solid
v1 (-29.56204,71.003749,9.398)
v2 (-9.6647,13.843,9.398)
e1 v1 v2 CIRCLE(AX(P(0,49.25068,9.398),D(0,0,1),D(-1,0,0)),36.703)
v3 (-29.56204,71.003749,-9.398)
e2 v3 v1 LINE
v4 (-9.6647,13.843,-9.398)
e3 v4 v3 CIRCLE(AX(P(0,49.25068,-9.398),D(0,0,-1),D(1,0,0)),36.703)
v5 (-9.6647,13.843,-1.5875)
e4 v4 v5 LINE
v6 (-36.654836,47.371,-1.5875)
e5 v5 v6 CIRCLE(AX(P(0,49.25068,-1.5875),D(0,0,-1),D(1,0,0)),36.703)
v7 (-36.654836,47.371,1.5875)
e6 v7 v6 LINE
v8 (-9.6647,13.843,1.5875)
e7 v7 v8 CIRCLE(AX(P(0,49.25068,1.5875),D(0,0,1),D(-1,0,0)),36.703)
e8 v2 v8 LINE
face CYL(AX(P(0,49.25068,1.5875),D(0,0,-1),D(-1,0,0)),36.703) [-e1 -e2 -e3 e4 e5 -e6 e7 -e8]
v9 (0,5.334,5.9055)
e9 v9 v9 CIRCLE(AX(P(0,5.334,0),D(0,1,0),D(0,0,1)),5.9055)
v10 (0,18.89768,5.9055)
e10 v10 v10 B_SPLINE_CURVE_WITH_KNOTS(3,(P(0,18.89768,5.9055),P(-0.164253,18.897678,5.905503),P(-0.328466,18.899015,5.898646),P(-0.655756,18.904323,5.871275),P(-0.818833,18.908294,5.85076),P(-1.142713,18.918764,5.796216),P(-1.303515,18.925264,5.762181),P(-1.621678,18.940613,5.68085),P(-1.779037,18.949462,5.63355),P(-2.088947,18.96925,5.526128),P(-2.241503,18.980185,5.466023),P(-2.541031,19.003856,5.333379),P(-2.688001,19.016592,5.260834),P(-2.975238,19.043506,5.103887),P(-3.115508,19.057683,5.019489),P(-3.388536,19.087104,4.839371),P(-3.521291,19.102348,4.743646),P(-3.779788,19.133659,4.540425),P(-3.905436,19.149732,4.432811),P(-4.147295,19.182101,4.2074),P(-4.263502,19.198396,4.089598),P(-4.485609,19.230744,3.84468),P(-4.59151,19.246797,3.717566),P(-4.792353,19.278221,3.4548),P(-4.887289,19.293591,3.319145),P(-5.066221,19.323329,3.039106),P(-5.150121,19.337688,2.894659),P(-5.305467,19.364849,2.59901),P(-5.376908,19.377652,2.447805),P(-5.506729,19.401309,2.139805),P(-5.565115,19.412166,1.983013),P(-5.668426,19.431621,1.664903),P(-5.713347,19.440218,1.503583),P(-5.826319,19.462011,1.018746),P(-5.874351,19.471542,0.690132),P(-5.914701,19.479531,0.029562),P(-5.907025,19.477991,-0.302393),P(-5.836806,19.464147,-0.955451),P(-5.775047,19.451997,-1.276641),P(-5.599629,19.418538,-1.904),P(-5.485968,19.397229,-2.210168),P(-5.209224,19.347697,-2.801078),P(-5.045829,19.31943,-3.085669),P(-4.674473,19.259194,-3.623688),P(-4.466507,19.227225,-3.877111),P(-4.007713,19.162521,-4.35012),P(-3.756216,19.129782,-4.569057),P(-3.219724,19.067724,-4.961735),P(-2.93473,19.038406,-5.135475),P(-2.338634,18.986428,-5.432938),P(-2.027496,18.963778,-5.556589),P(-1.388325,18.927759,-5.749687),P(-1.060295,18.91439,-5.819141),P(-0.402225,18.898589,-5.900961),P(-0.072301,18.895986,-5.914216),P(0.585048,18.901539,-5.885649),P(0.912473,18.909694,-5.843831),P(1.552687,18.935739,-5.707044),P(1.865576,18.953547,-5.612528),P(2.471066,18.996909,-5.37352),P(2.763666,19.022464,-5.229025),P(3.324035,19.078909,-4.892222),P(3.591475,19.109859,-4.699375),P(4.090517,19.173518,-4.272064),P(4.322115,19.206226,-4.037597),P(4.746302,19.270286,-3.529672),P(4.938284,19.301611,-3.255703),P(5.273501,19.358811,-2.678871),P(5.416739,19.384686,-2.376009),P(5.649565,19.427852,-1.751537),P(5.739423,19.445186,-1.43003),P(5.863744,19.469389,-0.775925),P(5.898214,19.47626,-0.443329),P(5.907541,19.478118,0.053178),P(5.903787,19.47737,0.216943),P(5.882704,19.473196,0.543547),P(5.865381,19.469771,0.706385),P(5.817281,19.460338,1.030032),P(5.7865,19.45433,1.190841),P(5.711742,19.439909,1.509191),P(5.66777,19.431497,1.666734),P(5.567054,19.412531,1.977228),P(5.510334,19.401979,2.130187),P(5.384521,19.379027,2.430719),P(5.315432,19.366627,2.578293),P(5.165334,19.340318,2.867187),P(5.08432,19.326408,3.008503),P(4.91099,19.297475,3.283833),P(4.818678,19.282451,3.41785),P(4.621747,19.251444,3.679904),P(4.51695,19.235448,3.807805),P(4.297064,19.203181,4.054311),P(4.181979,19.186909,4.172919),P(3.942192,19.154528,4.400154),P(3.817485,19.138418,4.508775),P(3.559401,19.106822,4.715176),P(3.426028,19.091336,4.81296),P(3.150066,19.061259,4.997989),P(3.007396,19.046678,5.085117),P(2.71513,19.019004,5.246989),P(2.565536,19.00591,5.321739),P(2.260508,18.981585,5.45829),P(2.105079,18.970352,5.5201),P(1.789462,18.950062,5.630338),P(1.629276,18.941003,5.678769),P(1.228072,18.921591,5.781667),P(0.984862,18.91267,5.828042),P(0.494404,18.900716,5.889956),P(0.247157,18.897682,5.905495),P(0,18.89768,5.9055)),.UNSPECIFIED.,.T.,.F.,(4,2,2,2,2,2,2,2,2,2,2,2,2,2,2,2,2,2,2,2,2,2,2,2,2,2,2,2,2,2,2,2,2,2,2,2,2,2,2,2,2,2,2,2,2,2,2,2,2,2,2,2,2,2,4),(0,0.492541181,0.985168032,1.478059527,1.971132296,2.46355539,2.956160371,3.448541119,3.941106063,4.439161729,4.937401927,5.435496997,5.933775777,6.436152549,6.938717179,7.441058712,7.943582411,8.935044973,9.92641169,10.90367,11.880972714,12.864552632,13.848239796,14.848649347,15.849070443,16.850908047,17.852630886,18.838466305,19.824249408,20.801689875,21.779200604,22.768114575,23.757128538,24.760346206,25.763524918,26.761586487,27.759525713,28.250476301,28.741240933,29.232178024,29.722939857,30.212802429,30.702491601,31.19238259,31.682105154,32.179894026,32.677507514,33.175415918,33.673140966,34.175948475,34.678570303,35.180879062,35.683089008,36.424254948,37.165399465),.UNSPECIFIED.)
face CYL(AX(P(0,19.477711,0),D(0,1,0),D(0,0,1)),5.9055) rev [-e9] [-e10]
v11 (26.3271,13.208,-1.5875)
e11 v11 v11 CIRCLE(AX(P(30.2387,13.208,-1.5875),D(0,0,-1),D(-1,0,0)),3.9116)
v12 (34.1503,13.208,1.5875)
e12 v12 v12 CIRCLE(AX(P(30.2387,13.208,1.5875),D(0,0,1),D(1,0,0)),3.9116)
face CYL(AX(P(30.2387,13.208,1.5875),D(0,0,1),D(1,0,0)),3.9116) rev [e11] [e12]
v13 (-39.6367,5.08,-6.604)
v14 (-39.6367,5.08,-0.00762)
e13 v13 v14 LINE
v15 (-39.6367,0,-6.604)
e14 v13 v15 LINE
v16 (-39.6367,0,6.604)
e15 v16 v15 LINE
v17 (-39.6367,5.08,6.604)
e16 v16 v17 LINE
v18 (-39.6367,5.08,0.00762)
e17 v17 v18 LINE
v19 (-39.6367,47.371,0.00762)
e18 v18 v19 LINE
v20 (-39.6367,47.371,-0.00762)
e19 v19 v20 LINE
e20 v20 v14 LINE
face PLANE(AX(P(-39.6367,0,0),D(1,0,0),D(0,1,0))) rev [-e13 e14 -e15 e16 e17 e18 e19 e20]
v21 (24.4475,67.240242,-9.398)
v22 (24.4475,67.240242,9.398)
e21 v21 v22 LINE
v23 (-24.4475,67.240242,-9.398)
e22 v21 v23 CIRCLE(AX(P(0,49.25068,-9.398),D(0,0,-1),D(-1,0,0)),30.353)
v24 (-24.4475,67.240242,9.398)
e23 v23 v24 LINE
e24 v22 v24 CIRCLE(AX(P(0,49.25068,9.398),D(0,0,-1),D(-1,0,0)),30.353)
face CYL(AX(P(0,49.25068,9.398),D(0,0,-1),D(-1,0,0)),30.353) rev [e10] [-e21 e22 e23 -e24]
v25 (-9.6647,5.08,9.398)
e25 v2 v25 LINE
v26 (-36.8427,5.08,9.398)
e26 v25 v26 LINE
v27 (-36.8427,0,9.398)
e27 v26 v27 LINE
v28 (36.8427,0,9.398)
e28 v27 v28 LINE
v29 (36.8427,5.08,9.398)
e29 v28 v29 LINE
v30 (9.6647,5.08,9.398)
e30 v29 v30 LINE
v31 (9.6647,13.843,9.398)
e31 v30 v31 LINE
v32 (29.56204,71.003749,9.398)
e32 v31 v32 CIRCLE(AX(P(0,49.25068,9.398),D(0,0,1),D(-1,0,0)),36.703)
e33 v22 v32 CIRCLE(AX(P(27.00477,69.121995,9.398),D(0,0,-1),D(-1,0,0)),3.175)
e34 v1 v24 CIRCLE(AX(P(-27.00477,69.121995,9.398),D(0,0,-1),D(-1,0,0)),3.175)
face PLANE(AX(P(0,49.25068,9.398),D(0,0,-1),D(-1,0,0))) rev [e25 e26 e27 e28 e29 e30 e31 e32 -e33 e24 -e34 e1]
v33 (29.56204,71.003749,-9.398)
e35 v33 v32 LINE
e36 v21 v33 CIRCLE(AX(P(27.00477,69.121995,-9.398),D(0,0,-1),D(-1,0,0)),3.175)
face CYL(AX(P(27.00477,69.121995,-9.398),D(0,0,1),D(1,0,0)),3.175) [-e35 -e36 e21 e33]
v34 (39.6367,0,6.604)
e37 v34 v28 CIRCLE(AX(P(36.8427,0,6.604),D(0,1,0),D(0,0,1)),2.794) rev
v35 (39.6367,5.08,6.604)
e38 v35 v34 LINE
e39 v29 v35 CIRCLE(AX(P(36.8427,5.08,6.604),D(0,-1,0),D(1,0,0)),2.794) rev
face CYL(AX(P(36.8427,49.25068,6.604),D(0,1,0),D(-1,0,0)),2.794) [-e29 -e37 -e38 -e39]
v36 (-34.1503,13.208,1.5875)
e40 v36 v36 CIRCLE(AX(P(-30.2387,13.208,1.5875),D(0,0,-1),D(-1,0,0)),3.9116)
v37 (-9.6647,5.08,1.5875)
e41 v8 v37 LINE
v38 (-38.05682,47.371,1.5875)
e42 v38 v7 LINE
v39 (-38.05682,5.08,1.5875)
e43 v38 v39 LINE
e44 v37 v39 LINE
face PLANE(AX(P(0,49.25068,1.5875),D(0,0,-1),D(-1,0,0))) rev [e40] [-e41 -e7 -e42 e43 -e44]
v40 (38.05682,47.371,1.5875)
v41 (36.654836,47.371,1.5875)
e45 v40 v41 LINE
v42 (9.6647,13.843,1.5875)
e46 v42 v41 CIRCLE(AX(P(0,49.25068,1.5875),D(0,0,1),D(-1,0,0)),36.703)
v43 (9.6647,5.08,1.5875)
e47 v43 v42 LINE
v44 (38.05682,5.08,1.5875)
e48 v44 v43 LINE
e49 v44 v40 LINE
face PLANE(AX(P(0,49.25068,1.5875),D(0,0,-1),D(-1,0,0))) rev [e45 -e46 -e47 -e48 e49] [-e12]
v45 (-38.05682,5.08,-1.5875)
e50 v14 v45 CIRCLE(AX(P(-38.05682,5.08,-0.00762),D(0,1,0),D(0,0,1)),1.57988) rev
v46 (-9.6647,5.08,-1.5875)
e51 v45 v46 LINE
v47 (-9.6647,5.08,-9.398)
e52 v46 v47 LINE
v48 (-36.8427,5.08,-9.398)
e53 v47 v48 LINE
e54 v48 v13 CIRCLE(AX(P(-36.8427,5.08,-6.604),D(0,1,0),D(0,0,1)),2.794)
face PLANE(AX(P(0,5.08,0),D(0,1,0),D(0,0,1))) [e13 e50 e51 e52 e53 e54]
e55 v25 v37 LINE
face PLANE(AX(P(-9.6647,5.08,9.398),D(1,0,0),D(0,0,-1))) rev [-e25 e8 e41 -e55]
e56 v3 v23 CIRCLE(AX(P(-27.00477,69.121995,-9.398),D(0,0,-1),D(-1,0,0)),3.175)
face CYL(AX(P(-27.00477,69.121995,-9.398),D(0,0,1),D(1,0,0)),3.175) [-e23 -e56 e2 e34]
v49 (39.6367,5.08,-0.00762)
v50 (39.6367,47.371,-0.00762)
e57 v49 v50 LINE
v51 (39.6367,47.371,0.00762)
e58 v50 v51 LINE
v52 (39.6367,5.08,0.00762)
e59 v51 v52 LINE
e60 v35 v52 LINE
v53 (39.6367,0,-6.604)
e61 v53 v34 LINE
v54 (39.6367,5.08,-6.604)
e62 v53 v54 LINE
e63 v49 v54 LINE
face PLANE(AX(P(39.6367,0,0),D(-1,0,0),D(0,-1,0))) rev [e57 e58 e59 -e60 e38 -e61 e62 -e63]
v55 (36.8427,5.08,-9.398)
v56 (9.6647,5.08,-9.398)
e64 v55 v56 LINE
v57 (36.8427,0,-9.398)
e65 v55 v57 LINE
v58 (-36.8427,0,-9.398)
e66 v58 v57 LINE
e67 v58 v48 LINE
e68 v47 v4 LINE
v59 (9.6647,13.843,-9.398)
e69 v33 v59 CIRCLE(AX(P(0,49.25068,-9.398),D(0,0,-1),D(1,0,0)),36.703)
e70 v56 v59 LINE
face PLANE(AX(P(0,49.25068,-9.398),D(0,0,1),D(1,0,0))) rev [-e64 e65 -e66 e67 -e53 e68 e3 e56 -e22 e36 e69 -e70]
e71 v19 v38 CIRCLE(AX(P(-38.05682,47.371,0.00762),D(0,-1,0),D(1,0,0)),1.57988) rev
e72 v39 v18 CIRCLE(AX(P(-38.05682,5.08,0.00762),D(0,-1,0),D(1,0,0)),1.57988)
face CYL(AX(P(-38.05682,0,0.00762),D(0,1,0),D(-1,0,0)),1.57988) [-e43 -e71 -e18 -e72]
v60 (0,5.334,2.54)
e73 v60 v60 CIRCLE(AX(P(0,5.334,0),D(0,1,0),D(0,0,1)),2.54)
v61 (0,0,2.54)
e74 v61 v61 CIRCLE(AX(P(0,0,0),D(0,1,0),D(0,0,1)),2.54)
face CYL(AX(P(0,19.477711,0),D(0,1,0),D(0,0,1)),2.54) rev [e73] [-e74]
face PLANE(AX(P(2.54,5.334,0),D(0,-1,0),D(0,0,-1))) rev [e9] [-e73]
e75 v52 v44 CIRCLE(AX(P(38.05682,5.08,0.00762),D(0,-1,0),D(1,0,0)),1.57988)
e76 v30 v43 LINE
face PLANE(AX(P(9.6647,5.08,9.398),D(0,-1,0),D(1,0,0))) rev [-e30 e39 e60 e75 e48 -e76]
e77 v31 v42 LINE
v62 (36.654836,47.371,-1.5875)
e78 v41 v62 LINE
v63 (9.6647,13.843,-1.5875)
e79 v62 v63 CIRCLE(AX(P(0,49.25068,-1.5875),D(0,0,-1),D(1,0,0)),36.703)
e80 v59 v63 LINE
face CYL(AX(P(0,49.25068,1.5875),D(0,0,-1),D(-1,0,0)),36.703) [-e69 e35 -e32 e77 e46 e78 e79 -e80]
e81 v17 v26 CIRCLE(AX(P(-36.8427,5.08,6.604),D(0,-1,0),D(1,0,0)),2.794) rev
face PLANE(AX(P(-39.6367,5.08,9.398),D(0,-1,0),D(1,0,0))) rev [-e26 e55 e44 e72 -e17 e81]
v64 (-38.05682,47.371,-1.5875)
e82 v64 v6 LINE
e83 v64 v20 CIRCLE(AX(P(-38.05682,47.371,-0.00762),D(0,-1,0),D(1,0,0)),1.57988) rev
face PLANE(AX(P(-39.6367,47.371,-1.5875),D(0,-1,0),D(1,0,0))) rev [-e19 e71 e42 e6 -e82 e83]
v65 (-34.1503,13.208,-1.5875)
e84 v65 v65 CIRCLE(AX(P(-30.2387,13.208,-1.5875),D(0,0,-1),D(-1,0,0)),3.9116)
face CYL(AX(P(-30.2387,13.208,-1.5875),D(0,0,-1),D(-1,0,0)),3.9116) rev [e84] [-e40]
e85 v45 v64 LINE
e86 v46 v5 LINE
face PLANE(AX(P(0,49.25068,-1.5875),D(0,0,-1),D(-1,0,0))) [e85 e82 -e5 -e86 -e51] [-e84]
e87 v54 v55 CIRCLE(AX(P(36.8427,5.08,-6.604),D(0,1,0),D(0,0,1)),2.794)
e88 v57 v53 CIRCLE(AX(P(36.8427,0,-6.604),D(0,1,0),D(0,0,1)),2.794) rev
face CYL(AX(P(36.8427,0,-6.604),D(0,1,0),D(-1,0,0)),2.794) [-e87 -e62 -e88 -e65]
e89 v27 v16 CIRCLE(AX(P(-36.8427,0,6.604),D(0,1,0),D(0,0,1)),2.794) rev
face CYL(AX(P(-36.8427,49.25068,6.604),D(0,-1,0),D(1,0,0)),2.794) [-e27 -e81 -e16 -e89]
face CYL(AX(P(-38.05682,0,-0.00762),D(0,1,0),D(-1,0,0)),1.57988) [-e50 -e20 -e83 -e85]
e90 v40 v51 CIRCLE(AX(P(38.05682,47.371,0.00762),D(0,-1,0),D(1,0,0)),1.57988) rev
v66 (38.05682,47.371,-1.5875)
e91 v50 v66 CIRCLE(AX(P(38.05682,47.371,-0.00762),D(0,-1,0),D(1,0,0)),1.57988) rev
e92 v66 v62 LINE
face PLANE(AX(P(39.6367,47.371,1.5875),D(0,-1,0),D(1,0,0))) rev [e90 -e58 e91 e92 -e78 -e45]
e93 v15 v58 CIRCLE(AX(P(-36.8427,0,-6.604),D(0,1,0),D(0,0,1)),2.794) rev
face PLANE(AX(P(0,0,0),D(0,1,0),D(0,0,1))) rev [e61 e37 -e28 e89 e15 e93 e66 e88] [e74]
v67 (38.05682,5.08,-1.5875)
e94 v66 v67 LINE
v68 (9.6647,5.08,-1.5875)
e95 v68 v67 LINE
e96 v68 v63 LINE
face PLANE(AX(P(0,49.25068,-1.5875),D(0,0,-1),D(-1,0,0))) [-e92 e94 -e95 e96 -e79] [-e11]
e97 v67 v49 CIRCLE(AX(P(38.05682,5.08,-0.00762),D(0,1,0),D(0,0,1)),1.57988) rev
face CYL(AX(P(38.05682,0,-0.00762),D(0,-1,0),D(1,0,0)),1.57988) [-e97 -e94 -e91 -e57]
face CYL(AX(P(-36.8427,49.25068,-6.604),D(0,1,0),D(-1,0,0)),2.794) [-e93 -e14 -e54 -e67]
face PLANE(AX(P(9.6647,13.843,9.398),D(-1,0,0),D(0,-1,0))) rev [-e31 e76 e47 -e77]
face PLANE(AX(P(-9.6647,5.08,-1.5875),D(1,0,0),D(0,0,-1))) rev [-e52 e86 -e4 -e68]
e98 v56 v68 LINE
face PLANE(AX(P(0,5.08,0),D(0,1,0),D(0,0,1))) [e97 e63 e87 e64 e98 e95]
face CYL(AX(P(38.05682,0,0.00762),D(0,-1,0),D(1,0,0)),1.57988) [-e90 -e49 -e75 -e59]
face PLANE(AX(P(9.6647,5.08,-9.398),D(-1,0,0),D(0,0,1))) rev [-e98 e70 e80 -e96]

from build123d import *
from build123d.topology import SkipClean

# Parameters (mm, degrees)
BOSS_EXTRUDE1_DEPTH      = 3.175
SKETCH2_W                = 73.3096723
SKETCH2_H                = 3.175
BOSS_EXTRUDE2_DEPTH      = 33.528
BOSS_EXTRUDE3_START      = 7.8105
BOSS_EXTRUDE3_DEPTH      = 7.8105
SKETCH4_W                = 3.175
SKETCH4_H                = 33.528
BOSS_EXTRUDE4_DEPTH      = 2.98186385
SKETCH5_W                = 3.175
SKETCH5_H                = 33.528
BOSS_EXTRUDE5_DEPTH      = 2.98186385
SKETCH6_W                = 79.2734
SKETCH6_H                = 10.9855
BOSS_EXTRUDE6_DEPTH      = 13.843
SKETCH7_W                = 29.972
SKETCH7_H                = 7.8105
CUT_EXTRUDE1_DEPTH       = 8.763
SKETCH8_W                = 29.972
SKETCH8_H                = 7.8105
CUT_EXTRUDE2_DEPTH       = 8.763
BOSS_EXTRUDE7_DEPTH      = 7.8105
CUT_EXTRUDE3_DEPTH       = 97.500739167
SKETCH11_W               = 30.353
SKETCH11_H               = 18.796
HOLE1_D                  = 5.08
HOLE1_CBORE_D            = 11.811
HOLE1_CBORE_DEPTH        = 14.143710789
M7_CLEARANCE_HOLE1_D     = 7.8232
M7_CLEARANCE_HOLE1_DEPTH = 10.9855
M7_CLEARANCE_HOLE2_D     = 7.8232
M7_CLEARANCE_HOLE2_DEPTH = 10.9855
FILLET1_R                = 1.57988
FILLET2_R                = 2.794


with BuildPart() as part:
    # Sketch1 → Boss-Extrude1 (new body)
    with BuildSketch(Plane(origin=(0, 0, -1.5875), x_dir=(-1, 0, 0), z_dir=(0, 0, -1))):
        with BuildLine():
            Line((-36.65483615, 47.371), (36.65483615, 47.371))
            ThreePointArc((36.65483615, 47.371), (0, 85.953679717), (-36.65483615, 47.371))
        make_face()
    extrude(amount=-BOSS_EXTRUDE1_DEPTH)

    # Sketch2 → Boss-Extrude2 (add)
    with BuildSketch(Plane.XZ.offset(-47.371)):
        Rectangle(SKETCH2_W, SKETCH2_H)
    extrude(amount=BOSS_EXTRUDE2_DEPTH)

    # Sketch3 → Boss-Extrude3 (add)
    with SkipClean():  # the faces are left unmerged after this step: merging them gives an invalid solid
        with BuildSketch(Plane(origin=(0, 0, -1.5875), x_dir=(-1, 0, 0), z_dir=(0, 0, -1)).offset(BOSS_EXTRUDE3_START)):
            with BuildLine():
                Line((9.6647, 13.843), (-9.6647, 13.843))
                ThreePointArc((-9.6647, 13.843), (0, 85.953679717), (9.6647, 13.843))
            make_face()
        extrude(amount=-BOSS_EXTRUDE3_DEPTH)

    # Sketch4 → Boss-Extrude4 (add)
    with SkipClean():  # the faces are left unmerged after this step: merging them gives an invalid solid
        with BuildSketch(Plane.ZY.offset(36.65483615)):
            with Locations((0, 30.607)):
                Rectangle(SKETCH4_W, SKETCH4_H)
        extrude(amount=BOSS_EXTRUDE4_DEPTH)

    # Sketch5 → Boss-Extrude5 (add)
    with SkipClean():  # the faces are left unmerged after this step: merging them gives an invalid solid
        with BuildSketch(Plane(origin=(36.65483615, 0, 0), x_dir=(0, 0, -1), z_dir=(1, 0, 0))):
            with Locations((0, 30.607)):
                Rectangle(SKETCH5_W, SKETCH5_H)
        extrude(amount=BOSS_EXTRUDE5_DEPTH)

    # Sketch6 → Boss-Extrude6 (add)
    with SkipClean():  # the faces are left unmerged after this step: merging them gives an invalid solid
        with BuildSketch(Plane.XZ.offset(-13.843)):
            with Locations((0, -3.90525)):
                Rectangle(SKETCH6_W, SKETCH6_H)
        extrude(amount=BOSS_EXTRUDE6_DEPTH)

    # Sketch7 → Cut-Extrude1 (cut)
    with SkipClean():  # the faces are left unmerged after this step: merging them gives an invalid solid
        with BuildSketch(Plane(origin=(0, 13.843, 0), x_dir=(-1, 0, 0), z_dir=(0, 1, 0))):
            with Locations((-24.6507, -5.49275)):
                Rectangle(SKETCH7_W, SKETCH7_H)
        extrude(amount=-CUT_EXTRUDE1_DEPTH, mode=Mode.SUBTRACT)

    # Sketch8 → Cut-Extrude2 (cut)
    with SkipClean():  # the faces are left unmerged after this step: merging them gives an invalid solid
        with BuildSketch(Plane(origin=(0, 13.843, 0), x_dir=(-1, 0, 0), z_dir=(0, 1, 0))):
            with Locations((24.6507, -5.49275)):
                Rectangle(SKETCH8_W, SKETCH8_H)
        extrude(amount=-CUT_EXTRUDE2_DEPTH, mode=Mode.SUBTRACT)

    # Sketch9 → Boss-Extrude7 (add)
    with SkipClean():  # the faces are left unmerged after this step: merging them gives an invalid solid
        with BuildSketch(Plane.XY.offset(1.5875)):
            with BuildLine():
                Line((9.6647, 13.843), (9.6647, 5.08))
                Line((9.6647, 5.08), (39.6367, 5.08))
                Line((39.6367, 5.08), (39.6367, 0))
                Line((39.6367, 0), (-39.6367, 0))
                Line((-39.6367, 0), (-39.6367, 5.08))
                Line((-39.6367, 5.08), (-9.6647, 5.08))
                Line((-9.6647, 5.08), (-9.6647, 13.843))
                ThreePointArc((-9.6647, 13.843), (0, 85.953679717), (9.6647, 13.843))
            make_face()
        extrude(amount=BOSS_EXTRUDE7_DEPTH)

    # Sketch10 → Cut-Extrude3 (cut, through all)
    with SkipClean():  # the faces are left unmerged after this step: merging them gives an invalid solid
        with BuildSketch(Plane.XY.offset(9.398)):
            with BuildLine():
                ThreePointArc((-29.562039749, 71.003748808), (-25.123016493, 71.679265301), (-24.4475, 67.240242044))
                ThreePointArc((-24.4475, 67.240242044), (0, 79.603679717), (24.4475, 67.240242044))
                ThreePointArc((24.4475, 67.240242044), (25.123016493, 71.679265301), (29.562039749, 71.003748808))
                ThreePointArc((29.562039749, 71.003748808), (0, 85.953679717), (-29.562039749, 71.003748808))
            make_face()
        extrude(amount=-CUT_EXTRUDE3_DEPTH, mode=Mode.SUBTRACT)

    # Sketch11 → Cut-Revolve1 (revolve, cut)
    with SkipClean():  # the faces are left unmerged after this step: merging them gives an invalid solid
        with BuildSketch(Plane.XZ.offset(-49.250679717)):
            with Locations((15.1765, 0)):
                Rectangle(SKETCH11_W, SKETCH11_H)
        revolve(axis=Axis((0, 49.250679717, 9.398), (0, 0, -1)), mode=Mode.SUBTRACT)

    # Hole1 (through all)
    with Locations(Plane(origin=(0, 19.477710789, 0), x_dir=(1, 0, 0), z_dir=(0, 1, 0))):
        with Locations((0, 0)):
            CounterBoreHole(HOLE1_D / 2, HOLE1_CBORE_D / 2, HOLE1_CBORE_DEPTH)

    # M7 Clearance Hole1
    with Locations(Plane(origin=(0, 0, -1.5875), x_dir=(-1, 0, 0), z_dir=(0, 0, -1))):
        with Locations((30.2387, 13.208)):
            Hole(M7_CLEARANCE_HOLE1_D / 2, depth=M7_CLEARANCE_HOLE1_DEPTH)

    # M7 Clearance Hole2
    with Locations(Plane.XY.offset(1.5875)):
        with Locations((30.2387, 13.208)):
            Hole(M7_CLEARANCE_HOLE2_D / 2, depth=M7_CLEARANCE_HOLE2_DEPTH)

    # Fillet1
    # the kernel refuses this fillet: 1.57988 mm, written as the material it takes off along each edge
    with BuildSketch(Plane(origin=(-39.6367, 13.843, -1.5875), x_dir=(1, 0, 0), z_dir=(0, 1, 0)), Plane(origin=(39.6367, 51.3207, -1.5875), x_dir=(-1, 0, 0), z_dir=(0, -1, 0)), Plane(origin=(-39.6367, 51.3207, 1.5875), x_dir=(1, 0, 0), z_dir=(0, -1, 0))) as fillet1_piece_1:
        with BuildLine():
            CenterArc((FILLET1_R, -FILLET1_R), FILLET1_R, 90, 90)
            Line((0, -FILLET1_R), (0, 0))
            Line((0, 0), (FILLET1_R, 0))
        make_face()
    extrude(amount=37.4777, mode=Mode.SUBTRACT)
    with BuildSketch(Plane(origin=(39.6367, 13.843, 1.5875), x_dir=(0, 0, -1), z_dir=(0, 1, 0))) as fillet1_piece_2:
        with BuildLine():
            CenterArc((FILLET1_R, FILLET1_R), FILLET1_R, 180, 90)
            Line((0, FILLET1_R), (0, 0))
            Line((0, 0), (FILLET1_R, 0))
        make_face()
    extrude(amount=37.4777, mode=Mode.SUBTRACT)
    with BuildSketch(Plane(origin=(-39.6367, 13.843, 1.5875), x_dir=(1, 0, 0), z_dir=(0, -1, 0)), Plane(origin=(39.6367, 13.843, 1.5875), x_dir=(0, 0, -1), z_dir=(0, -1, 0))) as fillet1_piece_3:
        with BuildLine():
            CenterArc((FILLET1_R, -FILLET1_R), FILLET1_R, 90, 90)
            Line((0, -FILLET1_R), (0, 0))
            Line((0, 0), (FILLET1_R, 0))
        make_face()
    extrude(amount=8.763, mode=Mode.SUBTRACT)
    with BuildSketch(Plane(origin=(39.6367, 13.843, -1.5875), x_dir=(0, 0, 1), z_dir=(0, -1, 0)), Plane(origin=(-39.6367, 13.843, -1.5875), x_dir=(1, 0, 0), z_dir=(0, -1, 0))) as fillet1_piece_4:
        with BuildLine():
            CenterArc((FILLET1_R, FILLET1_R), FILLET1_R, 180, 90)
            Line((0, FILLET1_R), (0, 0))
            Line((0, 0), (FILLET1_R, 0))
        make_face()
    extrude(amount=8.763, mode=Mode.SUBTRACT)

    # Fillet2
    fillet2_edges = [part.edges().sort_by_distance(p)[0] for p in [
        (-39.6367, 2.54, 9.398),
        (39.6367, 2.54, 9.398),
        (-39.6367, 2.54, -9.398),
        (39.6367, 2.54, -9.398),
    ]]
    fillet(fillet2_edges, radius=FILLET2_R)


solid = part.part
